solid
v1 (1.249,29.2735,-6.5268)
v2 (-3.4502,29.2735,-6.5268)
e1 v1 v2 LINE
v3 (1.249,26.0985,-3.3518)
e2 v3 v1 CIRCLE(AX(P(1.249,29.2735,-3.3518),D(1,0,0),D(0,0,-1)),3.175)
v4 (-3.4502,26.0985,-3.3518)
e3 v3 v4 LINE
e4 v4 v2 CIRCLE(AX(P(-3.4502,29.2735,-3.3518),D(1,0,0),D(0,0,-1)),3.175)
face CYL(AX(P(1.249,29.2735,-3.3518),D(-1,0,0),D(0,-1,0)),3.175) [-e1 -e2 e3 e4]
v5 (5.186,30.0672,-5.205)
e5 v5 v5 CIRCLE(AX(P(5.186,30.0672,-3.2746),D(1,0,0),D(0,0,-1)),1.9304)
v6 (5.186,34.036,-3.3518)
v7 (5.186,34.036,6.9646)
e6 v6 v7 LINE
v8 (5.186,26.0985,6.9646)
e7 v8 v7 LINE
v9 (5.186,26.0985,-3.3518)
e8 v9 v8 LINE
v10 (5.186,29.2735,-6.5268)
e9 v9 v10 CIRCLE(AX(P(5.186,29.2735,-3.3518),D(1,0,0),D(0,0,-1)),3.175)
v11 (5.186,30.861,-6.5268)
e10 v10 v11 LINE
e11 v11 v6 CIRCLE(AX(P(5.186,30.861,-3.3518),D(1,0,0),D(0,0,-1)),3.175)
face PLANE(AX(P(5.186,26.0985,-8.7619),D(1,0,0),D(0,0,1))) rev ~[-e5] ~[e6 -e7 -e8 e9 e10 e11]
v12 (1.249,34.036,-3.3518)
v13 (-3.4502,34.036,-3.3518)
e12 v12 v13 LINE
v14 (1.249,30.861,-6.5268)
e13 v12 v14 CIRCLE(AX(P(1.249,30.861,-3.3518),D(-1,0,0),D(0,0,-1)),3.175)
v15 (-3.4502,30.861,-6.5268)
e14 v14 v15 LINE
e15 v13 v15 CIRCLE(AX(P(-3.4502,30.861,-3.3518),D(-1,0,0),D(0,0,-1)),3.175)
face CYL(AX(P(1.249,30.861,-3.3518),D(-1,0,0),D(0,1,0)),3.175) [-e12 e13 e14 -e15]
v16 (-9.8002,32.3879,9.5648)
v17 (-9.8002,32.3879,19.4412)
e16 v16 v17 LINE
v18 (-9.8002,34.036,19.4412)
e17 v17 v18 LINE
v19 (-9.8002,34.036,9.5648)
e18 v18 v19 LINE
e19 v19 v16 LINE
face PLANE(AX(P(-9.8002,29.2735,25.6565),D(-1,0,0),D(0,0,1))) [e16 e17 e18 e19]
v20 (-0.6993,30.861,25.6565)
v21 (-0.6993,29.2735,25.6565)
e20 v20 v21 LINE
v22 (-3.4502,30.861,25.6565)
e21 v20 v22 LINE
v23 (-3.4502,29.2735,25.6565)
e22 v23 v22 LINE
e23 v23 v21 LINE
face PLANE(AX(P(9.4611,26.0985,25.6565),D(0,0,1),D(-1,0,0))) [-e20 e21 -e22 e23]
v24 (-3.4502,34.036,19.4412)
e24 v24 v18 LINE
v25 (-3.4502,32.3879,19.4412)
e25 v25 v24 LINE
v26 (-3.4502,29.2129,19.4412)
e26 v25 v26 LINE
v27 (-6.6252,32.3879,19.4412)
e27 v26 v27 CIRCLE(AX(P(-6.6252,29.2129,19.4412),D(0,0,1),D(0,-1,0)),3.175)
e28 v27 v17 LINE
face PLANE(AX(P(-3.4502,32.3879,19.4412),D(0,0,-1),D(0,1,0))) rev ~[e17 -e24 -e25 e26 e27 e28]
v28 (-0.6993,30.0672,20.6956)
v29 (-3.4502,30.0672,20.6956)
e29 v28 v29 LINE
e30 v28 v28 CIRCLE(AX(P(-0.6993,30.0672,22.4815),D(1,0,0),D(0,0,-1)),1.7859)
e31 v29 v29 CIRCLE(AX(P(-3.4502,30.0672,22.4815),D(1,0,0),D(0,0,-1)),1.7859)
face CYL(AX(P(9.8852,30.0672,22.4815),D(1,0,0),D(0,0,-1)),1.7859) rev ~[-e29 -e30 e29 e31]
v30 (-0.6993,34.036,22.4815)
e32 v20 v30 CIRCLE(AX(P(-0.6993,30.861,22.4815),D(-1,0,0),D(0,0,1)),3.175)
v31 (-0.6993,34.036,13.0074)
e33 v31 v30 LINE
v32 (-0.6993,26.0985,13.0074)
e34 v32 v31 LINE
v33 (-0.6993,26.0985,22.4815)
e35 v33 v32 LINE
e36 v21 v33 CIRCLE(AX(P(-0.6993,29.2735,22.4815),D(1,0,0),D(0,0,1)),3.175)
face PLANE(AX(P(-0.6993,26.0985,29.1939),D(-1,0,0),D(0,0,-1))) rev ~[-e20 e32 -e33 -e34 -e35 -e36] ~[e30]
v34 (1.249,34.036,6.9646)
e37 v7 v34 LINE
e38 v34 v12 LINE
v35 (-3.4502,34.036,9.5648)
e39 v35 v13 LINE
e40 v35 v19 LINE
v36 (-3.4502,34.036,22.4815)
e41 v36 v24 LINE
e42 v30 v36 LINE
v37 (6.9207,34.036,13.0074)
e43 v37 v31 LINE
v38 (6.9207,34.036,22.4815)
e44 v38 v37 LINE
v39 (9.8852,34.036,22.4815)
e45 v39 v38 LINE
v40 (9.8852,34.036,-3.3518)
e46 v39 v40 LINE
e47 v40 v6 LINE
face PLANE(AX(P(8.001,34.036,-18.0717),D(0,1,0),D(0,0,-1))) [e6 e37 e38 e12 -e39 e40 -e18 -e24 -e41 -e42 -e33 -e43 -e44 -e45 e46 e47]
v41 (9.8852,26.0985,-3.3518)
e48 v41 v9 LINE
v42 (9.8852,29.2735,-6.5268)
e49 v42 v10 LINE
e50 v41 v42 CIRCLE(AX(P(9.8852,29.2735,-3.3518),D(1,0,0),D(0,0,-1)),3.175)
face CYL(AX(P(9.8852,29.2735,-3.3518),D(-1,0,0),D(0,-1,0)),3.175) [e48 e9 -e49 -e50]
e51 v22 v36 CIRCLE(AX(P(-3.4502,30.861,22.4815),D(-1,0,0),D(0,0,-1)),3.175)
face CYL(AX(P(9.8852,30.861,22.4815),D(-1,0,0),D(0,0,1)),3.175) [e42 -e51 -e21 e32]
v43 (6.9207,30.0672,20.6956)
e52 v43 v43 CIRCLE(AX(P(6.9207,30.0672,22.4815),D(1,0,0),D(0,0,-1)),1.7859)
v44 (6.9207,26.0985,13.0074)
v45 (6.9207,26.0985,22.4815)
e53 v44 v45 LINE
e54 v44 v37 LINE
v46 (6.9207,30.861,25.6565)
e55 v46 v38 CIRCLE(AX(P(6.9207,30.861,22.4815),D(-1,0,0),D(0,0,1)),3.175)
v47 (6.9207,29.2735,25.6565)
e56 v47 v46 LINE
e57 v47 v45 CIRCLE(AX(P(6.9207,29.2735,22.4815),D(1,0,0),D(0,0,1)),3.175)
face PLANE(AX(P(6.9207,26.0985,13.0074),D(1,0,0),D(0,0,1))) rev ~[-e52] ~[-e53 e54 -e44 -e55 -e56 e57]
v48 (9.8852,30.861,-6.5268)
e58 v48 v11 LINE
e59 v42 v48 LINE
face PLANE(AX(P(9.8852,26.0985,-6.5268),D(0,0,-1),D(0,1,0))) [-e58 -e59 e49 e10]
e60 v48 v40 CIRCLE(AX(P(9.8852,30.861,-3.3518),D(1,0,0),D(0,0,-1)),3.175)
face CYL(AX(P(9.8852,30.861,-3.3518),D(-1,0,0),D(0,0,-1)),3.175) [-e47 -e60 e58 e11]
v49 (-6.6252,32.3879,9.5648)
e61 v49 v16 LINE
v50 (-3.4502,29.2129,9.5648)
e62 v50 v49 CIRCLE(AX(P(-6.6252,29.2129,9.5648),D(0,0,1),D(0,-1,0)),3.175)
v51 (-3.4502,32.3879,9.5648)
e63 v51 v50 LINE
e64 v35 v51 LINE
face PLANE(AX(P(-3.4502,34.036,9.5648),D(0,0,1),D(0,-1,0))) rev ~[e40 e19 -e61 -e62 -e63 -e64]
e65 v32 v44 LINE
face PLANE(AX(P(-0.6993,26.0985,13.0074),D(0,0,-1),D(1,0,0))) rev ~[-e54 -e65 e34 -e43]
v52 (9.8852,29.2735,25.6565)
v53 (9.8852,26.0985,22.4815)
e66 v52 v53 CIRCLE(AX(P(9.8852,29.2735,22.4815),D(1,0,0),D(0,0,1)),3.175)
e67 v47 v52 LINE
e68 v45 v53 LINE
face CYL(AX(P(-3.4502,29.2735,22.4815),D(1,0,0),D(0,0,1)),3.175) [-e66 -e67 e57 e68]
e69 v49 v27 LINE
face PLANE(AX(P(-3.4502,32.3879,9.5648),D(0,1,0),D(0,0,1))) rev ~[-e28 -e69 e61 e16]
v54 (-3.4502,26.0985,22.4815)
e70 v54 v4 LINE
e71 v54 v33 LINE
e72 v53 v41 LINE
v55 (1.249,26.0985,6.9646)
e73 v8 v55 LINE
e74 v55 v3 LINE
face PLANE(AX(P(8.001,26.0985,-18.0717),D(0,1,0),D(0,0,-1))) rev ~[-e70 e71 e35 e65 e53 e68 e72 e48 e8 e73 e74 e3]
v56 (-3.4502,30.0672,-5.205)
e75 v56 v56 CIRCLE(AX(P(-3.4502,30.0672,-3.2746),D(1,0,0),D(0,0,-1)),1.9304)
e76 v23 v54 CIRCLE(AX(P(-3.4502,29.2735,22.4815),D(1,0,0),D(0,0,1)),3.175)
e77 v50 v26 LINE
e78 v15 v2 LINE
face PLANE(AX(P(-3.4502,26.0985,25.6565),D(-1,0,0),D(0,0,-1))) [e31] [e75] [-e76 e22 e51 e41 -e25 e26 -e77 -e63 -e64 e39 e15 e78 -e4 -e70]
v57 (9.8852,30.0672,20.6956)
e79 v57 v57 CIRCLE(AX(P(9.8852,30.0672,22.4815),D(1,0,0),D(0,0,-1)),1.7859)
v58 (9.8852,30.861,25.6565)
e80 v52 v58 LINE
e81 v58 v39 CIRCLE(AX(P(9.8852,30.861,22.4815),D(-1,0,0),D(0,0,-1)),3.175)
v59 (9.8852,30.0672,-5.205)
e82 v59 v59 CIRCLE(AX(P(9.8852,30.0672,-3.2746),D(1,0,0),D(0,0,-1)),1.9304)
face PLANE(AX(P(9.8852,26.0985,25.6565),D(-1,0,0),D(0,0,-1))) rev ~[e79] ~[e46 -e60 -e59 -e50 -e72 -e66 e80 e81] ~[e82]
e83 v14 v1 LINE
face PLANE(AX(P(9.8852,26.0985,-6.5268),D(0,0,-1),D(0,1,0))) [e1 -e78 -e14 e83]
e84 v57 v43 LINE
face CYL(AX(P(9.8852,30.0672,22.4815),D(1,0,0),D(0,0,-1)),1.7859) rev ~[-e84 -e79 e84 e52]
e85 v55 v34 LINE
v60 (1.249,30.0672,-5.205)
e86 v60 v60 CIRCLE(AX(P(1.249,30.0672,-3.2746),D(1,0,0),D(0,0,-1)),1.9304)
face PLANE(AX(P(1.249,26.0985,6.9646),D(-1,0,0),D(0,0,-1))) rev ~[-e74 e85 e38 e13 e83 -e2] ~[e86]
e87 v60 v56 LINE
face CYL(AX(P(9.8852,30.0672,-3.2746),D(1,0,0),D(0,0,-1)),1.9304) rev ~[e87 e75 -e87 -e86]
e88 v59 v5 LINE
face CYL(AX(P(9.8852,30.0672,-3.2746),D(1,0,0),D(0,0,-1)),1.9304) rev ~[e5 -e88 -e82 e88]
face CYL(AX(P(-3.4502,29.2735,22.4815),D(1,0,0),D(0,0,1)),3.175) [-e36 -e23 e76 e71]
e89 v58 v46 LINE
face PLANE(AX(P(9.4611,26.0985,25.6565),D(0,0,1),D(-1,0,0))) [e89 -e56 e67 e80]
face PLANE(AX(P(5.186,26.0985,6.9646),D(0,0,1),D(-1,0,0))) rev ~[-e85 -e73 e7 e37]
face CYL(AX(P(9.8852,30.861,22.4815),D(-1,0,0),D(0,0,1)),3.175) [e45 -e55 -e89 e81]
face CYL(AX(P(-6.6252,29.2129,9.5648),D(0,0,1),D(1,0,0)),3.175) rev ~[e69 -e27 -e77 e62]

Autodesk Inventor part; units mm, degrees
ref_plane "YZ Plane" through (0, 0, 0) normal (1, 0, 0) x (0, 1, 0)
ref_plane "XZ Plane" through (0, 0, 0) normal (0, 1, 0) x (-1, 0, 0)
ref_plane "XY Plane" through (0, 0, 0) normal (0, 0, 1) x (1, 0, 0)
ref_plane "Work Plane1" through (8.001, 26.0985, -18.0717) normal (0, 1, 0) x (0, 0, -1)
sketch "Sketch1" plane through (8.001, 26.0985, -18.0717) normal (0, 1, 0) x (0, 0, -1)
  line L0 (-43.7282, -1.4601) -> (-43.7282, -1.8842)
  line L1 (-43.7282, -1.8842) -> (-9.3098, -1.8842)
  line L2 (-9.3098, -1.8842) -> (-9.3098, 2.815)
  line L3 (-43.7282, 11.0271) -> (-43.7282, 11.4512)
  line L4 (-43.7282, 11.4512) -> (-9.3098, 11.4512)
  line L5 (-9.3098, 11.4512) -> (-9.3098, 6.752)
  line L6 (-43.7282, -1.4601) -> (-43.7282, 11.0271)
  line L7 (-9.3098, 2.815) -> (-25.0363, 2.815)
  line L8 (-25.0363, 2.815) -> (-25.0363, 6.752)
  line L9 (-25.0363, 6.752) -> (-9.3098, 6.752)
  line L10 (-18.0537, 2.815) -> (-18.0537, -1.8842) construction
  line L11 (-18.0537, 6.752) -> (-18.0537, 11.4512) construction
  line L12 (-16.6851, 3.45) -> (-16.6851, 6.117) construction
  line L13 (-16.6851, 3.45) -> (-12.9069, 3.45) construction
  line L14 (-12.9069, 3.45) -> (-12.9069, 6.117) construction
  line L15 (-12.9069, 6.117) -> (-16.6851, 6.117) construction
  point P0 (-18.0717, 8.001)
  dimension "d19" = 0.635
  dimension "d20" = 0.635
extrude "Extrusion1" add sketch "Sketch1" along normal blind 7.9375
sketch "Sketch2" plane through (9.8852, 26.0985, 25.6565) normal (1, 0, 0) x (0, 0, -1)
  line L0 (34.4184, 0) -> (0, 0) construction
  line L1 (34.4184, 0) -> (34.4184, 7.9375) construction
  line L2 (0, 7.9375) -> (34.4184, 7.9375) construction
  line L3 (0, 0) -> (0, 7.9375) construction
  line L4 (34.4184, 0) -> (34.4184, 7.9375) construction
  line L5 (34.4184, 3.9687) -> (0, 3.9687) construction
  line L6 (34.4184, 0) -> (0, 0) construction
  line L7 (28.9311, 0) -> (28.9311, 7.9375) construction
  line L8 (34.4184, 7.9375) -> (14.8298, 7.9375) construction
  circle A0 centre (28.9311, 3.9687) radius 1.9304
  point P0 (25.6565, -26.0985)
  dimension "d8" = 3.8608
extrude "Extrusion2" cut sketch "Sketch2" against normal through all
fillet "Fillet1" radius 3.175 2 edges at (3.2175, 34.036, 25.6565) (3.2175, 26.0985, 25.6565)
sketch "Sketch3" plane through (9.8852, 26.0985, -8.7619) normal (1, 0, 0) x (0, 0, -1)
  circle A0 centre (-5.4873, 3.9688) radius 1.9304 projected
  line L0 (0, 0) -> (-31.2434, 0) projected
  line L1 (0, 0) -> (0, 7.9375) projected
  line L2 (-31.2434, 7.9375) -> (0, 7.9375) projected
  line L3 (-34.4184, 3.175) -> (-34.4184, 4.7625) projected
  line L4 (-31.2434, 3.175) -> (-31.2434, 4.7625) construction
  circle A1 centre (-31.2434, 3.9687) radius 1.7859
  arc A2 (-34.4184, 3.175) -> (-31.2434, 0) centre (-31.2434, 3.175) ccw projected
  arc A3 (-31.2434, 7.9375) -> (-34.4184, 4.7625) centre (-31.2434, 4.7625) ccw projected
  point P0 (-8.7619, -26.0985)
  dimension "d7" = 3.5719
extrude "Extrusion3" cut sketch "Sketch3" against normal through all contours A1
sketch "Sketch5" plane through (9.8852, 26.0985, -8.7619) normal (1, 0, 0) x (0, 0, -1)
  circle A0 centre (-31.2434, 3.9688) radius 1.7859 construction
  circle A1 centre (-5.4873, 3.9688) radius 1.9304 construction
  line L0 (0, 0) -> (-31.2434, 0) construction
  line L1 (0, 0) -> (0, 7.9375) construction
  line L2 (-31.2434, 7.9375) -> (0, 7.9375) construction
  line L3 (-34.4184, 3.175) -> (-34.4184, 4.7625) construction
  line L4 (-15.9544, 0) -> (0, 0) projected
  line L5 (-2.2351, 0) -> (-2.2351, 7.9375)
  line L6 (-15.9544, 7.9375) -> (0, 7.9375) projected
  line L7 (-2.2351, 0) -> (-8.7527, 0)
  line L8 (-34.4184, 7.9375) -> (0, 7.9375) projected
  line L9 (-2.2351, 0) -> (0, 0)
  line L10 (0, 0) -> (0, 7.9375)
  line L11 (0, 7.9375) -> (-2.2351, 7.9375)
  line L12 (-2.2351, 7.9375) -> (-2.2351, 0)
  arc A2 (-34.4184, 3.175) -> (-31.2434, 0) centre (-31.2434, 3.175) ccw projected
  arc A3 (-31.2434, 7.9375) -> (-34.4184, 4.7625) centre (-31.2434, 4.7625) ccw projected
  point P0 (-8.7619, -26.0985)
extrude "Extrusion4" cut sketch "Sketch5" against normal through all
fillet "Fillet2" radius 3.175 4 edges at (7.5356, 34.036, -6.5269) (-1.1006, 34.036, -6.5269) (7.5356, 26.0985, -6.5269) (-1.1006, 26.0985, -6.5269)
sketch "Sketch6" plane through (8.001, 26.0985, -18.0717) normal (0, -1, 0) x (1, 0, 0)
  line L0 (-1.7153, 46.6729) -> (-1.7153, 39.3669) construction
  line L1 (-8.0653, 39.3669) -> (-8.0653, 46.6729) construction
  line L2 (-1.0803, 47.2656) -> (-1.0803, 39.3486) construction
  line L3 (-8.7003, 39.3486) -> (-8.7003, 42.6343) construction
  line L4 (-1.0803, 47.2656) -> (-8.7003, 47.2656)
  line L5 (-8.7003, 47.2656) -> (-8.7003, 31.0791)
  line L6 (-8.7003, 31.0791) -> (-1.0803, 31.0791)
  line L7 (-1.0803, 31.0791) -> (-1.0803, 47.2656)
  point P0 (-8.001, 18.0717)
  dimension "d12" = 0.635
  dimension "d13" = 0.635
extrude "Extrusion5" cut sketch "Sketch6" against normal through all
sketch "Sketch8" plane through (-3.4502, 29.2735, 25.6565) normal (-1, 0, 0) x (0, 0, 1)
  arc A0 (-32.1833, 0) -> (-29.0083, -3.175) centre (-29.0083, 0) ccw construction
  line L0 (-3.175, -3.175) -> (-29.0083, -3.175) construction
  arc A1 (-3.175, -3.175) -> (0, 0) centre (-3.175, 0) ccw construction
  line L1 (0, 0) -> (0, 1.5875) construction
  arc A2 (0, 1.5875) -> (-3.175, 4.7625) centre (-3.175, 1.5875) ccw construction
  line L2 (-29.0083, 4.7625) -> (-3.175, 4.7625) construction
  arc A3 (-29.0083, 4.7625) -> (-32.1833, 1.5875) centre (-29.0083, 1.5875) ccw construction
  line L3 (-32.1833, 1.5875) -> (-32.1833, 0) construction
  circle A4 centre (-3.175, 0.7938) radius 1.7859 construction
  circle A5 centre (-28.9311, 0.7938) radius 1.9304 construction
  line L4 (-3.175, 4.7625) -> (-29.0083, 4.7625) projected
  line L5 (-6.2153, 4.7625) -> (-16.0917, 4.7625)
  line L6 (-16.0917, 4.7625) -> (-16.0917, 3.1144)
  line L7 (-16.0917, 3.1144) -> (-6.2153, 3.1144)
  line L8 (-6.2153, 3.1144) -> (-6.2153, 4.7625)
  point P0 (-25.6565, -29.2735)
extrude "Extrusion7" add sketch "Sketch8" along normal blind 6.35
fillet "Fillet3" radius 3.175 1 edges at (-3.4502, 32.3879, 14.503)
properties part number "lever2"
